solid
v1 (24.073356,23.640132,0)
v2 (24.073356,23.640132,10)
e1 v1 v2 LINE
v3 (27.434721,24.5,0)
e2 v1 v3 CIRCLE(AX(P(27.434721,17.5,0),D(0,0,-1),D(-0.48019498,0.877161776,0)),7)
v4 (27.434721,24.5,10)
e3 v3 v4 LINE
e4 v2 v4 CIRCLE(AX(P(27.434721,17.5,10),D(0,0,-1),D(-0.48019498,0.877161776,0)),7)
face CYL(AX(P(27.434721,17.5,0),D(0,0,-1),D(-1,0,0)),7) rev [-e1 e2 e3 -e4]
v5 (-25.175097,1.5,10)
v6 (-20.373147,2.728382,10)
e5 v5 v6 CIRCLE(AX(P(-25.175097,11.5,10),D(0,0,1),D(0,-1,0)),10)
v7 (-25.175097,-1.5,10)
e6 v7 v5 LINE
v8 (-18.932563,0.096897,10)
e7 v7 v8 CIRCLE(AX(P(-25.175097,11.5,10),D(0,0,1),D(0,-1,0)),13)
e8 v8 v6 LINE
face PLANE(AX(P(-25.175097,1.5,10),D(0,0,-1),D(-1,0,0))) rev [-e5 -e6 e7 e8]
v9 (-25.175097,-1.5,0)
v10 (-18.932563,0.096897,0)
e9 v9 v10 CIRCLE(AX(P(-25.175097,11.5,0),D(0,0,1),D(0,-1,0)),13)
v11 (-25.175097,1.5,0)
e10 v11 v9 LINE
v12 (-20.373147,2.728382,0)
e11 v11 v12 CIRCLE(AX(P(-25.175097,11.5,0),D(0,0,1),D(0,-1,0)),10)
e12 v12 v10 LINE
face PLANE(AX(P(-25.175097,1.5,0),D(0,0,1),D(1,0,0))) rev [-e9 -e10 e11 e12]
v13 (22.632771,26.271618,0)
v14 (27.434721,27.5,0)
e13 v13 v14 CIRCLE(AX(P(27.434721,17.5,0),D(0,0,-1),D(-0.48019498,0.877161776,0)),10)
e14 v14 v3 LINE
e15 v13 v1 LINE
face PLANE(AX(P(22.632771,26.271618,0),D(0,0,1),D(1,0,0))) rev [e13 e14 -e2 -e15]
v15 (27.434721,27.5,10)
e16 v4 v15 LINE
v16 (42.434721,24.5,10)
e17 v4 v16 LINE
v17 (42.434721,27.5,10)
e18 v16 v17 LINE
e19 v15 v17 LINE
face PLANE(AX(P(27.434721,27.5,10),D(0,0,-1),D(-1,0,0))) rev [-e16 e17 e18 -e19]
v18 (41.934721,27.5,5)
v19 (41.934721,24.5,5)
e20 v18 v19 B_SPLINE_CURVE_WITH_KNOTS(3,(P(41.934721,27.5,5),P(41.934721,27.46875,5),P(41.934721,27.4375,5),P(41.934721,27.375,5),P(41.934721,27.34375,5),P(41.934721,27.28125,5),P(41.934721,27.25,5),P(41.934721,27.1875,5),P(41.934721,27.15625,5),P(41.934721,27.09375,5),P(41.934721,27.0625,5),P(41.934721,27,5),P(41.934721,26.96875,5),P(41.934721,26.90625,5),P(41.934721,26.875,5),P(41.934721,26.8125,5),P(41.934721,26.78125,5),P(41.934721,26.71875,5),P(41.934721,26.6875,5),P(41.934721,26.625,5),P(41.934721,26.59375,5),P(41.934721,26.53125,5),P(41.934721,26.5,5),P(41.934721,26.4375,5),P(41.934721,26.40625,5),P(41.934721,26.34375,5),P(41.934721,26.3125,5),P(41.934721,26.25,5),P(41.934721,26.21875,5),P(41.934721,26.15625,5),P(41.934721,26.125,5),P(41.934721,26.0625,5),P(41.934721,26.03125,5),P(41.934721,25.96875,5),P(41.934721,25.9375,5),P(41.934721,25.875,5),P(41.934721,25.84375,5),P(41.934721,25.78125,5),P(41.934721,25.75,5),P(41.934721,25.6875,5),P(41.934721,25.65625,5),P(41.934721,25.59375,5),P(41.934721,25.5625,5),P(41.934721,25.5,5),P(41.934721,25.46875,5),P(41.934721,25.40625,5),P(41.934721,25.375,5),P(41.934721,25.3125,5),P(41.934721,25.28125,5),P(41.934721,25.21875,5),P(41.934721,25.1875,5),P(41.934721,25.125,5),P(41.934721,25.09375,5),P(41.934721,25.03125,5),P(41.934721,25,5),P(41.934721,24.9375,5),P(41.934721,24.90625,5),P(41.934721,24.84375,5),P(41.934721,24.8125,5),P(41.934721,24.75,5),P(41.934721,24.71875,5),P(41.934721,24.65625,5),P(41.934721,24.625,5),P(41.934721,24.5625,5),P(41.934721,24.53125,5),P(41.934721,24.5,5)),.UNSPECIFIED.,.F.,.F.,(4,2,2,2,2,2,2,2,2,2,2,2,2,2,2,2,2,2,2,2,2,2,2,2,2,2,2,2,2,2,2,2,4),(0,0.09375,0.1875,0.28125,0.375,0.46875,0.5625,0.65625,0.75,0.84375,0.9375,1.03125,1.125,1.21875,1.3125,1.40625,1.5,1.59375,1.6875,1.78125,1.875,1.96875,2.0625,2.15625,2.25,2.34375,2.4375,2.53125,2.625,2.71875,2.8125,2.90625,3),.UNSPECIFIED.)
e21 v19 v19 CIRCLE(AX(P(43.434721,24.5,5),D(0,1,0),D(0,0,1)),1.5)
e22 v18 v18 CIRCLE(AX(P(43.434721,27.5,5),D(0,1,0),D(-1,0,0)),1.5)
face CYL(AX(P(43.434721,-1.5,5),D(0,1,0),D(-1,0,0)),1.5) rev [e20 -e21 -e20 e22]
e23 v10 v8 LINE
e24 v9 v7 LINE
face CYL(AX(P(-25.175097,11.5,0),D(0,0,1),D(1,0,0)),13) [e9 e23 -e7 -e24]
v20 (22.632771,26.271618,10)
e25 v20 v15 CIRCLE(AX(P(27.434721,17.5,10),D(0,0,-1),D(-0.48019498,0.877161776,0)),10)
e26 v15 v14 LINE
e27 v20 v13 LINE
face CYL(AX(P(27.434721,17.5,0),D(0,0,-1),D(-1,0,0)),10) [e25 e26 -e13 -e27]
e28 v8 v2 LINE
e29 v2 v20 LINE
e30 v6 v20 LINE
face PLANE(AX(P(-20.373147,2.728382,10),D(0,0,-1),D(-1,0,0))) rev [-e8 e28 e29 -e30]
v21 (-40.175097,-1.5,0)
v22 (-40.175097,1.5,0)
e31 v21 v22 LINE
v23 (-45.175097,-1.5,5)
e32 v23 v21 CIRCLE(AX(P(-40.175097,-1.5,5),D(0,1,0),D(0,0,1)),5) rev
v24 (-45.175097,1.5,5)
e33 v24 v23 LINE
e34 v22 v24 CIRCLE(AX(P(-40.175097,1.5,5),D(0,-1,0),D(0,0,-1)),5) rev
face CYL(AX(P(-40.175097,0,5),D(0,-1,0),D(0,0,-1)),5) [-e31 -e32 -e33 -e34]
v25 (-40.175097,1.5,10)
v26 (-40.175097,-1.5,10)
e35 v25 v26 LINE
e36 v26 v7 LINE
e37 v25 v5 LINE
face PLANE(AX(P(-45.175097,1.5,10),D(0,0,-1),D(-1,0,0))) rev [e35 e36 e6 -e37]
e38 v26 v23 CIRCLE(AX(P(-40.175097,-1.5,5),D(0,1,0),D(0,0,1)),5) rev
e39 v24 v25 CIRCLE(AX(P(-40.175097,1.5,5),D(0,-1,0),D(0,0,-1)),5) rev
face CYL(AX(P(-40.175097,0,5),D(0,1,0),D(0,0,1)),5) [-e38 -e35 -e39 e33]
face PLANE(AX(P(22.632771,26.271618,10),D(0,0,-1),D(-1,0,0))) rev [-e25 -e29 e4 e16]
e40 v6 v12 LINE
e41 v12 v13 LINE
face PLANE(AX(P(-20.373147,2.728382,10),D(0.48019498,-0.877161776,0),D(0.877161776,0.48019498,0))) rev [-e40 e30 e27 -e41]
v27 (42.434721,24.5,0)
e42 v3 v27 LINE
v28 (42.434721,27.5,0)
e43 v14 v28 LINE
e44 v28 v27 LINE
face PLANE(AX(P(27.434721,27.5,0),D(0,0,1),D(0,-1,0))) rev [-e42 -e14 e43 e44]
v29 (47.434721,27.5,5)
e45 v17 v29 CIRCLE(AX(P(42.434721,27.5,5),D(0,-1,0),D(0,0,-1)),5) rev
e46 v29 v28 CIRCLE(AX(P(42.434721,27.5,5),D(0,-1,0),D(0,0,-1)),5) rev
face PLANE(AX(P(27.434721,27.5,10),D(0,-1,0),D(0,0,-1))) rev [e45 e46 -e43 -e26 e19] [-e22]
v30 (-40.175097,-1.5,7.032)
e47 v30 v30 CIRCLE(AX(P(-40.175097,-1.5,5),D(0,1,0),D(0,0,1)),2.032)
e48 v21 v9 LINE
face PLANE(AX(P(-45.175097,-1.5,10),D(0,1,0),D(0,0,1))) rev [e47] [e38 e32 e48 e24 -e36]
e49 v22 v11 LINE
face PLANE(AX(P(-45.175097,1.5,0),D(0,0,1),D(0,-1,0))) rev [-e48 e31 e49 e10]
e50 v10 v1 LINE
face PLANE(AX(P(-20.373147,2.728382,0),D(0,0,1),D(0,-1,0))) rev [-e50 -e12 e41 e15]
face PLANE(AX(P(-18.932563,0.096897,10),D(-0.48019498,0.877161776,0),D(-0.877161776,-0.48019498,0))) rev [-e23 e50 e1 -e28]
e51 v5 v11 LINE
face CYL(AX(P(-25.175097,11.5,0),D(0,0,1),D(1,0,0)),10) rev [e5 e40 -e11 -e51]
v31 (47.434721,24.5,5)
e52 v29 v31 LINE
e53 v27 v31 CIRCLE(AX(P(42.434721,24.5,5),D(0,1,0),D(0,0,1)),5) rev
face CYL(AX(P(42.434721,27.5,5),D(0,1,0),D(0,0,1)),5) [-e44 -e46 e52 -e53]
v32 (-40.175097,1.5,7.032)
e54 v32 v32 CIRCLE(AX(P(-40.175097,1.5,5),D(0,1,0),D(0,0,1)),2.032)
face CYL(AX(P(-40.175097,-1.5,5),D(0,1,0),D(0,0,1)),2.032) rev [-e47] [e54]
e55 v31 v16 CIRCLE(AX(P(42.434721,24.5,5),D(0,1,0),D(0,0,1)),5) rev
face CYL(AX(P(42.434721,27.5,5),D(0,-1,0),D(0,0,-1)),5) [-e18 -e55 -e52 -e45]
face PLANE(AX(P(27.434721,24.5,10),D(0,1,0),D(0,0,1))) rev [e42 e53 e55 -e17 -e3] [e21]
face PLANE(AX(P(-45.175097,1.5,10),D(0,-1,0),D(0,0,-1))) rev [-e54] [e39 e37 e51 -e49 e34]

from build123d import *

# Parameters (mm, degrees)
SKETCH3_W          = 10
SKETCH3_H          = 3
SKETCH5_R          = 1.5
CUT_EXTRUDE2_DEPTH = 57.489403968
SKETCH2_R          = 2.032
CUT_EXTRUDE1_DEPTH = 56.009569719
FILLET1_R          = 5


with BuildPart() as part:
    # Sweep1: sweep along a path in Sketch4
    with BuildLine(Plane.XY) as sweep1_path:
        Line((-45.175097276, 1.5), (-25.175097276, 1.5))
        ThreePointArc((-25.175097276, 1.5), (-22.696809318, 1.811961561), (-20.373147477, 2.72838224))
        Line((-20.373147477, 2.72838224), (22.632771246, 26.27161776))
        ThreePointArc((22.632771246, 26.27161776), (24.956433088, 27.188038439), (27.434721046, 27.5))
        Line((27.434721046, 27.5), (47.434721046, 27.5))
    # Sketch3 → Sweep1 (sweep)
    with BuildSketch(Plane.ZY.offset(45.175097276)):
        with Locations((5, 0)):
            Rectangle(SKETCH3_W, SKETCH3_H)
    sweep(path=sweep1_path.line)

    # Sketch5 → Cut-Extrude2 (cut, through all)
    with BuildSketch(Plane(origin=(0, 27.5, 0), x_dir=(1, 0, 0), z_dir=(0, 1, 0))):
        with Locations(Location((43.434721046, -5, 0), (0, 0, 180))):
            Circle(SKETCH5_R)
    extrude(amount=-CUT_EXTRUDE2_DEPTH, mode=Mode.SUBTRACT)

    # Sketch2 → Cut-Extrude1 (cut, through all)
    with BuildSketch(Plane(origin=(0, 1.5, 0), x_dir=(1, 0, 0), z_dir=(0, 1, 0))):
        with Locations(Location((-40.175097276, -5, 0), (0, 0, 270))):
            Circle(SKETCH2_R)
    extrude(amount=-CUT_EXTRUDE1_DEPTH, mode=Mode.SUBTRACT)

    # Fillet1
    fillet1_edges = [part.edges().sort_by_distance(p)[0] for p in [
        (47.434721046, 26, 0),
        (47.434721046, 26, 10),
        (-45.175097276, 0, 10),
        (-45.175097276, 0, 0),
    ]]
    fillet(fillet1_edges, radius=FILLET1_R - 0.0001)  # a hair under: the kernel refuses the full size


solid = part.part
